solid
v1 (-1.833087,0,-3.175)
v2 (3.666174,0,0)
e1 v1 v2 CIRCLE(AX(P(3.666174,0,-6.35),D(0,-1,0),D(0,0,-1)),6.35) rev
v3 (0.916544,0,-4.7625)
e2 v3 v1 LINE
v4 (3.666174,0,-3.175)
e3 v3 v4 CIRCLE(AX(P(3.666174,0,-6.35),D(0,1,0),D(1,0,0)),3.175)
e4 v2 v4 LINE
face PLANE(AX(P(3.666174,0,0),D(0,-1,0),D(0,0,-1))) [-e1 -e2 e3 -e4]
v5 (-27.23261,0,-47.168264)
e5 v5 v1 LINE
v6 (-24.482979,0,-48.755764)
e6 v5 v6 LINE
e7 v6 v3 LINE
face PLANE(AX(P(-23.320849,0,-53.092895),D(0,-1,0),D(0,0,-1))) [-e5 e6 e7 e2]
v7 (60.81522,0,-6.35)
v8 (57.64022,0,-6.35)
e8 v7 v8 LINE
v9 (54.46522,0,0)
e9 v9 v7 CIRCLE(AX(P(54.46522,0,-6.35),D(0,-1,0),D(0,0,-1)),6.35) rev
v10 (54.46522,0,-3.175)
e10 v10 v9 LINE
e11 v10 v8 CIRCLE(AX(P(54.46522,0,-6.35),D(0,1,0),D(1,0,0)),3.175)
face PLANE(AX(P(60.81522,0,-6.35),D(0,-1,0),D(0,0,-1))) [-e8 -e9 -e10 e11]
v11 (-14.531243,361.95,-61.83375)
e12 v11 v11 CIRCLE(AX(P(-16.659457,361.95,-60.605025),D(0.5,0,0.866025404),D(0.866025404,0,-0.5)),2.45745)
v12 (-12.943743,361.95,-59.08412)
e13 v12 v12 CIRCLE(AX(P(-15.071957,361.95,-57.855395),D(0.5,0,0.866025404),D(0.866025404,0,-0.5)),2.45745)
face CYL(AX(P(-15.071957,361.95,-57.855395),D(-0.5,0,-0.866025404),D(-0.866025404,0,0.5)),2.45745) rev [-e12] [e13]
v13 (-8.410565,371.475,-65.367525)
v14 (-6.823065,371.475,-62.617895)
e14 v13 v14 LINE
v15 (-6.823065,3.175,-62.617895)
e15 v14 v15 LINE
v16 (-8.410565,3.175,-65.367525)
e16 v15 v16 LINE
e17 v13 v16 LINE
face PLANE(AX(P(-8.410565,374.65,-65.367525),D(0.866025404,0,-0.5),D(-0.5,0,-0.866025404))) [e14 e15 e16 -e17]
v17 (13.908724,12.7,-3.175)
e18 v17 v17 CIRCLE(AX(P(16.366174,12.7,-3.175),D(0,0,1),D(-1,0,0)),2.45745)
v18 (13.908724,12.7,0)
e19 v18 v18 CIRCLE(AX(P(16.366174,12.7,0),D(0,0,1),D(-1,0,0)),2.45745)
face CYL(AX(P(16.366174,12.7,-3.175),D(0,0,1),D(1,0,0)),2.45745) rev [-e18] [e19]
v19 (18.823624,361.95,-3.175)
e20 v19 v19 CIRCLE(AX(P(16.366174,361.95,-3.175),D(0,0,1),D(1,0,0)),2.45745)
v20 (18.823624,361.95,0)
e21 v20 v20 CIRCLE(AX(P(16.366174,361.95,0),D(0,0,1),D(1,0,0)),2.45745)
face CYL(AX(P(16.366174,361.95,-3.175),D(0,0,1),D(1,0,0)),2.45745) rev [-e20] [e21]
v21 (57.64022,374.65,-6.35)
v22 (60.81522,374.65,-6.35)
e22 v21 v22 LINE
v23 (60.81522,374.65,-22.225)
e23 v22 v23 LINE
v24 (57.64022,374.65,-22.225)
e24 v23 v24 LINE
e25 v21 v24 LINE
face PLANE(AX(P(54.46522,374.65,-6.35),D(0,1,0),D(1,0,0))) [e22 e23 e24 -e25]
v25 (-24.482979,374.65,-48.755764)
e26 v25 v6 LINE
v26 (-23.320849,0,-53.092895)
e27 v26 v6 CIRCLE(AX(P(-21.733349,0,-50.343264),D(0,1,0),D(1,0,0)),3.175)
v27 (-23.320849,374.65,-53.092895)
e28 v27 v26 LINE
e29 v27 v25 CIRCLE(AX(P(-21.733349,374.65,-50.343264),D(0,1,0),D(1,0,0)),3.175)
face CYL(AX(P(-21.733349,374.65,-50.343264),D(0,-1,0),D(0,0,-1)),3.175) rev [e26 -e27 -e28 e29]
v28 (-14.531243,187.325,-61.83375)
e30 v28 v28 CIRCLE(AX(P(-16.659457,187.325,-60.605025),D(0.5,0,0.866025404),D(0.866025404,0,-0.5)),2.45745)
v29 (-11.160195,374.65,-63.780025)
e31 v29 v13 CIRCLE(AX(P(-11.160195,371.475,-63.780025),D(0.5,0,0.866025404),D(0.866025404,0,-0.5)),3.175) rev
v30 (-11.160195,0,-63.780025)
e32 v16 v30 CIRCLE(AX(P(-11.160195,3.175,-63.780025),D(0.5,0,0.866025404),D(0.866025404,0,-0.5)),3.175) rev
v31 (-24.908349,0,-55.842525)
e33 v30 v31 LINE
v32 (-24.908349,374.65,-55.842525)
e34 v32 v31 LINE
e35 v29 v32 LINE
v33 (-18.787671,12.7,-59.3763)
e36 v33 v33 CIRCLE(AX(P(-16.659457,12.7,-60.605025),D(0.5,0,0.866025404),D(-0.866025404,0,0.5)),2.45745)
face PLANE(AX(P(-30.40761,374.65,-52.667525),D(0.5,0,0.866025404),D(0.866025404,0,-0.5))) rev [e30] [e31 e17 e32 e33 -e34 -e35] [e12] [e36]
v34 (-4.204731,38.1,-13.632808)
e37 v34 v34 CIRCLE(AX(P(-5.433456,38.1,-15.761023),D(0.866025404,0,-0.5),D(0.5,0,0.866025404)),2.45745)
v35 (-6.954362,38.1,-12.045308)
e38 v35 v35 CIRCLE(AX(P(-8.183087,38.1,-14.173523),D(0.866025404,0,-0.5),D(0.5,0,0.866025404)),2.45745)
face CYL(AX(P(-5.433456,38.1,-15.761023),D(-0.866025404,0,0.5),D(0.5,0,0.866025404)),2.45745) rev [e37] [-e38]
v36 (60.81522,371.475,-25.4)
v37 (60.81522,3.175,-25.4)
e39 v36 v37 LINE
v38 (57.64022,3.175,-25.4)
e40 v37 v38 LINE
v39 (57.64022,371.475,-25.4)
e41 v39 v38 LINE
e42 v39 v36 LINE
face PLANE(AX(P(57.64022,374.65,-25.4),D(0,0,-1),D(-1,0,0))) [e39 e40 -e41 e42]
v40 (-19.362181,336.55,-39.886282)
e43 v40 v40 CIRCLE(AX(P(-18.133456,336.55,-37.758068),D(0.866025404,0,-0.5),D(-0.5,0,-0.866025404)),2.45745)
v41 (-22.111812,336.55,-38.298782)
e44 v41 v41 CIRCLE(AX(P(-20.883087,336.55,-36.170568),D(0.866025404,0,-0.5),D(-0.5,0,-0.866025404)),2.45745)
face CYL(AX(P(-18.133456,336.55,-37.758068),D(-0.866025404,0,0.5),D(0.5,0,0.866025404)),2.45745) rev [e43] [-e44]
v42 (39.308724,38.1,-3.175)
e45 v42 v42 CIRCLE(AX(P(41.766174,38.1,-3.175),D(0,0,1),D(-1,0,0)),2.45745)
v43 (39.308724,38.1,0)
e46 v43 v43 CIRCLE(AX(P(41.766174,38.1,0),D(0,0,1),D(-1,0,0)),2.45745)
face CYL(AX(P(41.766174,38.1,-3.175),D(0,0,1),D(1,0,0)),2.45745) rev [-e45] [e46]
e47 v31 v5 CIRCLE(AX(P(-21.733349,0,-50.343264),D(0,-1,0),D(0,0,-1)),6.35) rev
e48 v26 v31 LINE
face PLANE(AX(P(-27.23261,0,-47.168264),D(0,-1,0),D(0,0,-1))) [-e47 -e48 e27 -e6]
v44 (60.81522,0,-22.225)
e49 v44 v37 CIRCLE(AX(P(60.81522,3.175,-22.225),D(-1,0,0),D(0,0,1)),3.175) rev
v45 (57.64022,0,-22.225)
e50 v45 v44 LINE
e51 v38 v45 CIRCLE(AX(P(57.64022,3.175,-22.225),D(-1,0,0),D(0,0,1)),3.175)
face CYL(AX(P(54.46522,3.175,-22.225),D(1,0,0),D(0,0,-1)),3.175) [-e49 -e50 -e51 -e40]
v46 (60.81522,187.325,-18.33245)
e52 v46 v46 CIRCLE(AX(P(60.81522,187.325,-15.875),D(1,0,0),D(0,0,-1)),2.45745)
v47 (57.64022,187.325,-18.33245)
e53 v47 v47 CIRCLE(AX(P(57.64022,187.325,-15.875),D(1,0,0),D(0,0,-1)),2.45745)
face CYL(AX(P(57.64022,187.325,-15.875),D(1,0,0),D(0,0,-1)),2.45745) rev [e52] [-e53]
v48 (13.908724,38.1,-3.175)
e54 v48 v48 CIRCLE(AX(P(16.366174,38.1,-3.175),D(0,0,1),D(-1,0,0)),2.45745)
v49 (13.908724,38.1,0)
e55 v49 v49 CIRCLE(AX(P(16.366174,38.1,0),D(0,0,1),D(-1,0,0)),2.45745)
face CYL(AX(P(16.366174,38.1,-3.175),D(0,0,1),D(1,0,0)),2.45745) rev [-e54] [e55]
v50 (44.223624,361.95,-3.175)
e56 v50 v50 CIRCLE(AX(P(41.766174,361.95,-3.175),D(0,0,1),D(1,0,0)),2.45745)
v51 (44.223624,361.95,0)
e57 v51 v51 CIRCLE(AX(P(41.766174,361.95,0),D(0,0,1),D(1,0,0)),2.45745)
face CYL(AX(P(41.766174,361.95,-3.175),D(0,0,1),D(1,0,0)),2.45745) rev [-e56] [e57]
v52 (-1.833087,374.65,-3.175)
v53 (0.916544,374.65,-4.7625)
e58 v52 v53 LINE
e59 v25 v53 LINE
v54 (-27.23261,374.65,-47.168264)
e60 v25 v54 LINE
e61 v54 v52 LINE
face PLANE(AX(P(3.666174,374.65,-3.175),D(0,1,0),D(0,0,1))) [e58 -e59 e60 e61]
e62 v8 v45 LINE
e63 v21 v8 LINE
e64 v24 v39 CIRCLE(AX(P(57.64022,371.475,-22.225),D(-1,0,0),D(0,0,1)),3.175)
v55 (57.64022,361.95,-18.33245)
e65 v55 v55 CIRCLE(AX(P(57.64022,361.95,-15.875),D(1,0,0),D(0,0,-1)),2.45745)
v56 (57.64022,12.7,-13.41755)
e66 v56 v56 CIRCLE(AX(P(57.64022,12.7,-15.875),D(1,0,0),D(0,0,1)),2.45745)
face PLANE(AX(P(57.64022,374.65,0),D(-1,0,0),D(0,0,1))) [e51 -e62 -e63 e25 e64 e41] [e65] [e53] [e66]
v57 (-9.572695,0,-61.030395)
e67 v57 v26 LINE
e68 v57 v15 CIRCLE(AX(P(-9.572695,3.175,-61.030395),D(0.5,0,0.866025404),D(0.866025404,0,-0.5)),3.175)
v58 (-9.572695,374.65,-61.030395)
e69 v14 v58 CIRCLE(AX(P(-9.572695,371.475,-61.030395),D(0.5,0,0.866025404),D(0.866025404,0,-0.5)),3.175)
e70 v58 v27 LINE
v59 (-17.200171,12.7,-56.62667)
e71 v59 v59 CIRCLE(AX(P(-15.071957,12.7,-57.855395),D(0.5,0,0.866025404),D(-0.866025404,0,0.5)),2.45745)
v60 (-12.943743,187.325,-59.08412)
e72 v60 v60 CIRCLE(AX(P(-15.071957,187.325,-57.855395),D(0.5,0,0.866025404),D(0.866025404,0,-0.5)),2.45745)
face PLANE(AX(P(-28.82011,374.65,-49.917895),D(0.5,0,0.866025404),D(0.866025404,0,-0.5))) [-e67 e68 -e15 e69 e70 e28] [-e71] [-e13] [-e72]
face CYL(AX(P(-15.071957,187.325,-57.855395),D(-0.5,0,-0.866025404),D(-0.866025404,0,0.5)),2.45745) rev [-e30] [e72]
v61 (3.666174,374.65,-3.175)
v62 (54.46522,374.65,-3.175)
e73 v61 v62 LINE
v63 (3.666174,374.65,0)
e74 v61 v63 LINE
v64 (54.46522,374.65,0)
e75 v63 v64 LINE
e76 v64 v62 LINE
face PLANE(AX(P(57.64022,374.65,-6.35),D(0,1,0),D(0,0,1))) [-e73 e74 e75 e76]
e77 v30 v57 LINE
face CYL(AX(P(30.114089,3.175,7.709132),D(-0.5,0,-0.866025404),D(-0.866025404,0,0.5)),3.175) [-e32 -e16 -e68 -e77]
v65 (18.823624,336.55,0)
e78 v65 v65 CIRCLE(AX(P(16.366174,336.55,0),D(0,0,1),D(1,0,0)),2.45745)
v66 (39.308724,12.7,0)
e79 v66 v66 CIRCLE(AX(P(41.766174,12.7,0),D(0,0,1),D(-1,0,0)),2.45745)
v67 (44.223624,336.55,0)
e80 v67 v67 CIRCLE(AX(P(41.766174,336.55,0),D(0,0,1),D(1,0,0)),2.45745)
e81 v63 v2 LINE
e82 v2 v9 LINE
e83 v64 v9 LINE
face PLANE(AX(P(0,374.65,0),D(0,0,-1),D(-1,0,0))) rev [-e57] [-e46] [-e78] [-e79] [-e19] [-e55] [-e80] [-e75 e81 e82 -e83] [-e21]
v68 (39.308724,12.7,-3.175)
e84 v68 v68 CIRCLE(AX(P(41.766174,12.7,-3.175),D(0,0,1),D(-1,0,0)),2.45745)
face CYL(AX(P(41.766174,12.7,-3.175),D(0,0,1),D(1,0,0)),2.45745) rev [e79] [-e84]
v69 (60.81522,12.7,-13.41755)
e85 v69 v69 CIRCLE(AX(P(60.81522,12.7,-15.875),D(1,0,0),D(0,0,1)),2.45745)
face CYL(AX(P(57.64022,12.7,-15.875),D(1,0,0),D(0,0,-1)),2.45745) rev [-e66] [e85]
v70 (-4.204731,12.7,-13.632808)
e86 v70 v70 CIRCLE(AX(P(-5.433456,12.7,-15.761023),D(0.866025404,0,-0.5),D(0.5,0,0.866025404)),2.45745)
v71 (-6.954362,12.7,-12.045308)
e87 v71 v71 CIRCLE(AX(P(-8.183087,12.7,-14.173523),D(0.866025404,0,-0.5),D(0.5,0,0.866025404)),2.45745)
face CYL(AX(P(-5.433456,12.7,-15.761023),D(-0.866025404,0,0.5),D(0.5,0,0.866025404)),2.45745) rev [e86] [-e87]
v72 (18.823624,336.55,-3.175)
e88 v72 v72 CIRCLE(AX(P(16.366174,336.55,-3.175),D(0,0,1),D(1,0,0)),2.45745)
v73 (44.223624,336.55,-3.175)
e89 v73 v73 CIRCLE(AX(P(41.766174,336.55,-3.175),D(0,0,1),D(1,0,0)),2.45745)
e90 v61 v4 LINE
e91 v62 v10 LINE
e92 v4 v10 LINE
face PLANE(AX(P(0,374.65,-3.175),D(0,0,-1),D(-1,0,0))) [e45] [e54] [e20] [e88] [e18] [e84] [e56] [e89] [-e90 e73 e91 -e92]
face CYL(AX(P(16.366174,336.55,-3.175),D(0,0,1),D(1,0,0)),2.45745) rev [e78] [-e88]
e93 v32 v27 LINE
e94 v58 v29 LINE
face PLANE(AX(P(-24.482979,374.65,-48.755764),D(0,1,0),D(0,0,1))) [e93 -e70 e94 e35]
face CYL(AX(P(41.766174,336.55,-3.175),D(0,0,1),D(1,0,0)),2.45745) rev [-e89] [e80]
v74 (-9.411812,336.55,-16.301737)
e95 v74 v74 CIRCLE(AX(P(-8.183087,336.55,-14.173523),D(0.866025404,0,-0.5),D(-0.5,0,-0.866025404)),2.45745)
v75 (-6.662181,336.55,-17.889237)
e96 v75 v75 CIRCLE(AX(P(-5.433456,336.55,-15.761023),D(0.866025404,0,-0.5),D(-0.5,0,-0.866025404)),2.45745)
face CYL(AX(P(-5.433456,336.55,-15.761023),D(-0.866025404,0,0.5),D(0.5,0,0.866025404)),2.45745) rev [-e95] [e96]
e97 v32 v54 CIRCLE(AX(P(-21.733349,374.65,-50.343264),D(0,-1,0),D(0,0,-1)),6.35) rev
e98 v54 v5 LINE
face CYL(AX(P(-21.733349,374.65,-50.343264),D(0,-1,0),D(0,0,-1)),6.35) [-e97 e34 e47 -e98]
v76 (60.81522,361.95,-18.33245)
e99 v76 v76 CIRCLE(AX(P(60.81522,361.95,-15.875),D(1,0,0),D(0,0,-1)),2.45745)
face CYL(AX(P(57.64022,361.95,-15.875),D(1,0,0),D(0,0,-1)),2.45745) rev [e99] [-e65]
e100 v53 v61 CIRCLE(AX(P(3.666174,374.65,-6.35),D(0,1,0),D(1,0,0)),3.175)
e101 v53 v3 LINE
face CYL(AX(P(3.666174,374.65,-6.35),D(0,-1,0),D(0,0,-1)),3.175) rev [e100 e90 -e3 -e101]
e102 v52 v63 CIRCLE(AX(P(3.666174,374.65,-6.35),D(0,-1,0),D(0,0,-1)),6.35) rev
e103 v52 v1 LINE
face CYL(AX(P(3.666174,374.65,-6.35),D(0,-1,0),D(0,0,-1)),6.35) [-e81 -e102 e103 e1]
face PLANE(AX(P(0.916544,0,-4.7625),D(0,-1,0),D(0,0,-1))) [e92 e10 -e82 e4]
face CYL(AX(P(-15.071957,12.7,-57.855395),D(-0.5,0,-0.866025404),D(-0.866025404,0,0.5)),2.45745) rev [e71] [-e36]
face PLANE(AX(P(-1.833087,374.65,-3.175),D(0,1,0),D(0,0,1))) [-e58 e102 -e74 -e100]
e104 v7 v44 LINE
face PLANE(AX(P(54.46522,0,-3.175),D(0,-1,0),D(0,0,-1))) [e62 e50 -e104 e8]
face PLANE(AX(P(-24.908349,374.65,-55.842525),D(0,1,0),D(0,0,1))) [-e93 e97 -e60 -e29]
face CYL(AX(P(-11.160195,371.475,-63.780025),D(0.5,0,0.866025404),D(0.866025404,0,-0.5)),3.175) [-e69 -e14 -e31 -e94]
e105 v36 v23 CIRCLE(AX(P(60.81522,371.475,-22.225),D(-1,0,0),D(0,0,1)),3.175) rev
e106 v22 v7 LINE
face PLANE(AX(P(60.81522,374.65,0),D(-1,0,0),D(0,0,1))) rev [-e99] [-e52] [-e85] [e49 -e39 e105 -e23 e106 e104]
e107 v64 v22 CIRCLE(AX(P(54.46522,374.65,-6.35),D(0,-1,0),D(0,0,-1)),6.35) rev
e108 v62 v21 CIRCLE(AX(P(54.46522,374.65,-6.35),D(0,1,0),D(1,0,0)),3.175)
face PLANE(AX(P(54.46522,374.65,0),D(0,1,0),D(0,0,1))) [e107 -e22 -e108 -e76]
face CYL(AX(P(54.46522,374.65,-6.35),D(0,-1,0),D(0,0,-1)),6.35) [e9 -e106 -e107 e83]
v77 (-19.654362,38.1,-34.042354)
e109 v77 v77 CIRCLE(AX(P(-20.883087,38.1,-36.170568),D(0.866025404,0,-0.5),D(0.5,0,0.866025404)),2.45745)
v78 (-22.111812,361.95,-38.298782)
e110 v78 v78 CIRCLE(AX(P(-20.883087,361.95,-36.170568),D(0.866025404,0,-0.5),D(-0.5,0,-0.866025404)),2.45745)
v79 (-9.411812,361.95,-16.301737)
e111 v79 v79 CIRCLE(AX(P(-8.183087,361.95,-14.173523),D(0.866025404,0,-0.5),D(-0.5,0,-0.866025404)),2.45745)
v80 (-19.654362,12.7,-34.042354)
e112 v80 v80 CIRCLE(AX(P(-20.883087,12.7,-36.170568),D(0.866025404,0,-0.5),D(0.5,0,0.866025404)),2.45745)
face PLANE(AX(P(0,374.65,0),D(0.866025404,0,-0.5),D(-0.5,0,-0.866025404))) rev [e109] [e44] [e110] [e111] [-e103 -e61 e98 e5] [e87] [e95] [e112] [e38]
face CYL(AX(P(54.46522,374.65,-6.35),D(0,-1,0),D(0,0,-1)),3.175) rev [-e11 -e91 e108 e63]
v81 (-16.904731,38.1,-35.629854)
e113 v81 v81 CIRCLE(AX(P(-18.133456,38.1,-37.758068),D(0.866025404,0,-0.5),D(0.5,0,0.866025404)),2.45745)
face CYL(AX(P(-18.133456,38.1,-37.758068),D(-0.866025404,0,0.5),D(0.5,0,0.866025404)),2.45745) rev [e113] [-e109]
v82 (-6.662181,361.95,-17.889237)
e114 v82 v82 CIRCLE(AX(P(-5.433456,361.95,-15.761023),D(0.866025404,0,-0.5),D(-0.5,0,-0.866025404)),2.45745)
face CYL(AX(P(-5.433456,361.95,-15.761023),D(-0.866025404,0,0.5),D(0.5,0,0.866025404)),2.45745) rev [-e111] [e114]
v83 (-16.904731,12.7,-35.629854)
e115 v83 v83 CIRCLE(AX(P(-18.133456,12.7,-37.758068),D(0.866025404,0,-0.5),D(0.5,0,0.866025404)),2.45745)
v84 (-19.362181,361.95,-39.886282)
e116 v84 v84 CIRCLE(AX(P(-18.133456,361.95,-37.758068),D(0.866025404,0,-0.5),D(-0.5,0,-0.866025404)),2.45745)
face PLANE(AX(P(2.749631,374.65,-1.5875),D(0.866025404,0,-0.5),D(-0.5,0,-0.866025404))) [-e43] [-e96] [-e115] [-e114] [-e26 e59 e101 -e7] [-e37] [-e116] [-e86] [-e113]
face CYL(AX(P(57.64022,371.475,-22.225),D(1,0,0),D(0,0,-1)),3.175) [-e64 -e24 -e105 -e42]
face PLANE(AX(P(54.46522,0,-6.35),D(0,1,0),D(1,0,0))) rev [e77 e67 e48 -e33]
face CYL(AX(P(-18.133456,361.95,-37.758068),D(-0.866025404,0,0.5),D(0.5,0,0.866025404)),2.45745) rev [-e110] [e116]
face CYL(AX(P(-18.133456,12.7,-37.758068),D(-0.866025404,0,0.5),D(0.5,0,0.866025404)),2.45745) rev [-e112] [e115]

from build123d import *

# Parameters (mm, degrees)
BASE_FLANGE1_DEPTH = 374.65
SKETCH2_R          = 2.45745
CUT_EXTRUDE1_DEPTH = 3.175
SKETCH4_R          = 2.45745
CUT_EXTRUDE2_DEPTH = 3.175
FILLET1_R          = 3.175


# Sheet-metal steps are written as plain solids
with BuildPart() as part:
    # Sketch1 → Base-Flange1 (new body)
    with BuildSketch(Plane(origin=(0, 0, 0), x_dir=(1, 0, 0), z_dir=(0, 1, 0))):
        with BuildLine():
            Line((60.81522, 25.4), (60.81522, 6.35))
            ThreePointArc((60.81522, 6.35), (58.955348061, 1.859871939), (54.46522, 0))
            Line((54.46522, 0), (3.666174209, 0))
            ThreePointArc((3.666174209, 0), (0.491174209, 0.850738686), (-1.833087105, 3.175))
            Line((-1.833087105, 3.175), (-27.23261, 47.168264143))
            ThreePointArc((-27.23261, 47.168264143), (-27.866977683, 51.986765079), (-24.908348686, 55.842525457))
            Line((-24.908348686, 55.842525457), (-8.410564744, 65.367525457))
            Line((-8.410564744, 65.367525457), (-6.823064744, 62.6178948))
            Line((-6.823064744, 62.6178948), (-23.320848686, 53.0928948))
            ThreePointArc((-23.320848686, 53.0928948), (-24.800163184, 51.165014611), (-24.482979343, 48.755764143))
            Line((-24.482979343, 48.755764143), (0.916543552, 4.7625))
            ThreePointArc((0.916543552, 4.7625), (2.078674209, 3.600369343), (3.666174209, 3.175))
            Line((3.666174209, 3.175), (54.46522, 3.175))
            ThreePointArc((54.46522, 3.175), (56.71028403, 4.10493597), (57.64022, 6.35))
            Line((57.64022, 6.35), (57.64022, 25.4))
            Line((57.64022, 25.4), (60.81522, 25.4))
        make_face()
    extrude(amount=BASE_FLANGE1_DEPTH)

    # Sketch2 → Cut-Extrude1 (cut)
    with BuildSketch(Plane.XY):
        with Locations((16.366174209, 361.95)):
            Circle(SKETCH2_R)
        with Locations((16.366174209, 336.55)):
            Circle(SKETCH2_R)
        with Locations((41.766174209, 336.55)):
            Circle(SKETCH2_R)
        with Locations((41.766174209, 361.95)):
            Circle(SKETCH2_R)
        with Locations(Location((41.766174209, 12.7, 0), (0, 0, 180))):
            Circle(SKETCH2_R)
        with Locations(Location((16.366174209, 12.7, 0), (0, 0, 180))):
            Circle(SKETCH2_R)
        with Locations(Location((41.766174209, 38.1, 0), (0, 0, 180))):
            Circle(SKETCH2_R)
        with Locations(Location((16.366174209, 38.1, 0), (0, 0, 180))):
            Circle(SKETCH2_R)
    cut_extrude1 = extrude(amount=-CUT_EXTRUDE1_DEPTH, mode=Mode.SUBTRACT)

    # Sketch4 → Cut-Extrude2 (cut)
    with BuildSketch(Plane(origin=(60.81522, 0, 0), x_dir=(0, 0, -1), z_dir=(1, 0, 0))):
        with Locations((15.875, 361.95)):
            Circle(SKETCH4_R)
        with Locations(Location((15.875, 12.7, 0), (0, 0, 180))):
            Circle(SKETCH4_R)
        with Locations((15.875, 187.325)):
            Circle(SKETCH4_R)
    cut_extrude2 = extrude(amount=-CUT_EXTRUDE2_DEPTH, mode=Mode.SUBTRACT)

    # Mirror1: Cut-Extrude1, Cut-Extrude2 across plane
    add(cut_extrude1.mirror(Plane(origin=(0, 0, 0), x_dir=(-0.49999999999999795, 0, 0.8660254037844398), z_dir=(-0.8660254037844398, 0, -0.49999999999999795))), mode=Mode.SUBTRACT)
    add(cut_extrude2.mirror(Plane(origin=(0, 0, 0), x_dir=(-0.49999999999999795, 0, 0.8660254037844398), z_dir=(-0.8660254037844398, 0, -0.49999999999999795))), mode=Mode.SUBTRACT)

    # Fillet1
    fillet1_edges = [part.edges().sort_by_distance(p)[0] for p in [
        (-7.616814744, 0, -63.992710128),
        (59.22772, 0, -25.4),
        (-7.616814744, 374.65, -63.992710128),
        (59.22772, 374.65, -25.4),
    ]]
    fillet(fillet1_edges, radius=FILLET1_R)


solid = part.part
